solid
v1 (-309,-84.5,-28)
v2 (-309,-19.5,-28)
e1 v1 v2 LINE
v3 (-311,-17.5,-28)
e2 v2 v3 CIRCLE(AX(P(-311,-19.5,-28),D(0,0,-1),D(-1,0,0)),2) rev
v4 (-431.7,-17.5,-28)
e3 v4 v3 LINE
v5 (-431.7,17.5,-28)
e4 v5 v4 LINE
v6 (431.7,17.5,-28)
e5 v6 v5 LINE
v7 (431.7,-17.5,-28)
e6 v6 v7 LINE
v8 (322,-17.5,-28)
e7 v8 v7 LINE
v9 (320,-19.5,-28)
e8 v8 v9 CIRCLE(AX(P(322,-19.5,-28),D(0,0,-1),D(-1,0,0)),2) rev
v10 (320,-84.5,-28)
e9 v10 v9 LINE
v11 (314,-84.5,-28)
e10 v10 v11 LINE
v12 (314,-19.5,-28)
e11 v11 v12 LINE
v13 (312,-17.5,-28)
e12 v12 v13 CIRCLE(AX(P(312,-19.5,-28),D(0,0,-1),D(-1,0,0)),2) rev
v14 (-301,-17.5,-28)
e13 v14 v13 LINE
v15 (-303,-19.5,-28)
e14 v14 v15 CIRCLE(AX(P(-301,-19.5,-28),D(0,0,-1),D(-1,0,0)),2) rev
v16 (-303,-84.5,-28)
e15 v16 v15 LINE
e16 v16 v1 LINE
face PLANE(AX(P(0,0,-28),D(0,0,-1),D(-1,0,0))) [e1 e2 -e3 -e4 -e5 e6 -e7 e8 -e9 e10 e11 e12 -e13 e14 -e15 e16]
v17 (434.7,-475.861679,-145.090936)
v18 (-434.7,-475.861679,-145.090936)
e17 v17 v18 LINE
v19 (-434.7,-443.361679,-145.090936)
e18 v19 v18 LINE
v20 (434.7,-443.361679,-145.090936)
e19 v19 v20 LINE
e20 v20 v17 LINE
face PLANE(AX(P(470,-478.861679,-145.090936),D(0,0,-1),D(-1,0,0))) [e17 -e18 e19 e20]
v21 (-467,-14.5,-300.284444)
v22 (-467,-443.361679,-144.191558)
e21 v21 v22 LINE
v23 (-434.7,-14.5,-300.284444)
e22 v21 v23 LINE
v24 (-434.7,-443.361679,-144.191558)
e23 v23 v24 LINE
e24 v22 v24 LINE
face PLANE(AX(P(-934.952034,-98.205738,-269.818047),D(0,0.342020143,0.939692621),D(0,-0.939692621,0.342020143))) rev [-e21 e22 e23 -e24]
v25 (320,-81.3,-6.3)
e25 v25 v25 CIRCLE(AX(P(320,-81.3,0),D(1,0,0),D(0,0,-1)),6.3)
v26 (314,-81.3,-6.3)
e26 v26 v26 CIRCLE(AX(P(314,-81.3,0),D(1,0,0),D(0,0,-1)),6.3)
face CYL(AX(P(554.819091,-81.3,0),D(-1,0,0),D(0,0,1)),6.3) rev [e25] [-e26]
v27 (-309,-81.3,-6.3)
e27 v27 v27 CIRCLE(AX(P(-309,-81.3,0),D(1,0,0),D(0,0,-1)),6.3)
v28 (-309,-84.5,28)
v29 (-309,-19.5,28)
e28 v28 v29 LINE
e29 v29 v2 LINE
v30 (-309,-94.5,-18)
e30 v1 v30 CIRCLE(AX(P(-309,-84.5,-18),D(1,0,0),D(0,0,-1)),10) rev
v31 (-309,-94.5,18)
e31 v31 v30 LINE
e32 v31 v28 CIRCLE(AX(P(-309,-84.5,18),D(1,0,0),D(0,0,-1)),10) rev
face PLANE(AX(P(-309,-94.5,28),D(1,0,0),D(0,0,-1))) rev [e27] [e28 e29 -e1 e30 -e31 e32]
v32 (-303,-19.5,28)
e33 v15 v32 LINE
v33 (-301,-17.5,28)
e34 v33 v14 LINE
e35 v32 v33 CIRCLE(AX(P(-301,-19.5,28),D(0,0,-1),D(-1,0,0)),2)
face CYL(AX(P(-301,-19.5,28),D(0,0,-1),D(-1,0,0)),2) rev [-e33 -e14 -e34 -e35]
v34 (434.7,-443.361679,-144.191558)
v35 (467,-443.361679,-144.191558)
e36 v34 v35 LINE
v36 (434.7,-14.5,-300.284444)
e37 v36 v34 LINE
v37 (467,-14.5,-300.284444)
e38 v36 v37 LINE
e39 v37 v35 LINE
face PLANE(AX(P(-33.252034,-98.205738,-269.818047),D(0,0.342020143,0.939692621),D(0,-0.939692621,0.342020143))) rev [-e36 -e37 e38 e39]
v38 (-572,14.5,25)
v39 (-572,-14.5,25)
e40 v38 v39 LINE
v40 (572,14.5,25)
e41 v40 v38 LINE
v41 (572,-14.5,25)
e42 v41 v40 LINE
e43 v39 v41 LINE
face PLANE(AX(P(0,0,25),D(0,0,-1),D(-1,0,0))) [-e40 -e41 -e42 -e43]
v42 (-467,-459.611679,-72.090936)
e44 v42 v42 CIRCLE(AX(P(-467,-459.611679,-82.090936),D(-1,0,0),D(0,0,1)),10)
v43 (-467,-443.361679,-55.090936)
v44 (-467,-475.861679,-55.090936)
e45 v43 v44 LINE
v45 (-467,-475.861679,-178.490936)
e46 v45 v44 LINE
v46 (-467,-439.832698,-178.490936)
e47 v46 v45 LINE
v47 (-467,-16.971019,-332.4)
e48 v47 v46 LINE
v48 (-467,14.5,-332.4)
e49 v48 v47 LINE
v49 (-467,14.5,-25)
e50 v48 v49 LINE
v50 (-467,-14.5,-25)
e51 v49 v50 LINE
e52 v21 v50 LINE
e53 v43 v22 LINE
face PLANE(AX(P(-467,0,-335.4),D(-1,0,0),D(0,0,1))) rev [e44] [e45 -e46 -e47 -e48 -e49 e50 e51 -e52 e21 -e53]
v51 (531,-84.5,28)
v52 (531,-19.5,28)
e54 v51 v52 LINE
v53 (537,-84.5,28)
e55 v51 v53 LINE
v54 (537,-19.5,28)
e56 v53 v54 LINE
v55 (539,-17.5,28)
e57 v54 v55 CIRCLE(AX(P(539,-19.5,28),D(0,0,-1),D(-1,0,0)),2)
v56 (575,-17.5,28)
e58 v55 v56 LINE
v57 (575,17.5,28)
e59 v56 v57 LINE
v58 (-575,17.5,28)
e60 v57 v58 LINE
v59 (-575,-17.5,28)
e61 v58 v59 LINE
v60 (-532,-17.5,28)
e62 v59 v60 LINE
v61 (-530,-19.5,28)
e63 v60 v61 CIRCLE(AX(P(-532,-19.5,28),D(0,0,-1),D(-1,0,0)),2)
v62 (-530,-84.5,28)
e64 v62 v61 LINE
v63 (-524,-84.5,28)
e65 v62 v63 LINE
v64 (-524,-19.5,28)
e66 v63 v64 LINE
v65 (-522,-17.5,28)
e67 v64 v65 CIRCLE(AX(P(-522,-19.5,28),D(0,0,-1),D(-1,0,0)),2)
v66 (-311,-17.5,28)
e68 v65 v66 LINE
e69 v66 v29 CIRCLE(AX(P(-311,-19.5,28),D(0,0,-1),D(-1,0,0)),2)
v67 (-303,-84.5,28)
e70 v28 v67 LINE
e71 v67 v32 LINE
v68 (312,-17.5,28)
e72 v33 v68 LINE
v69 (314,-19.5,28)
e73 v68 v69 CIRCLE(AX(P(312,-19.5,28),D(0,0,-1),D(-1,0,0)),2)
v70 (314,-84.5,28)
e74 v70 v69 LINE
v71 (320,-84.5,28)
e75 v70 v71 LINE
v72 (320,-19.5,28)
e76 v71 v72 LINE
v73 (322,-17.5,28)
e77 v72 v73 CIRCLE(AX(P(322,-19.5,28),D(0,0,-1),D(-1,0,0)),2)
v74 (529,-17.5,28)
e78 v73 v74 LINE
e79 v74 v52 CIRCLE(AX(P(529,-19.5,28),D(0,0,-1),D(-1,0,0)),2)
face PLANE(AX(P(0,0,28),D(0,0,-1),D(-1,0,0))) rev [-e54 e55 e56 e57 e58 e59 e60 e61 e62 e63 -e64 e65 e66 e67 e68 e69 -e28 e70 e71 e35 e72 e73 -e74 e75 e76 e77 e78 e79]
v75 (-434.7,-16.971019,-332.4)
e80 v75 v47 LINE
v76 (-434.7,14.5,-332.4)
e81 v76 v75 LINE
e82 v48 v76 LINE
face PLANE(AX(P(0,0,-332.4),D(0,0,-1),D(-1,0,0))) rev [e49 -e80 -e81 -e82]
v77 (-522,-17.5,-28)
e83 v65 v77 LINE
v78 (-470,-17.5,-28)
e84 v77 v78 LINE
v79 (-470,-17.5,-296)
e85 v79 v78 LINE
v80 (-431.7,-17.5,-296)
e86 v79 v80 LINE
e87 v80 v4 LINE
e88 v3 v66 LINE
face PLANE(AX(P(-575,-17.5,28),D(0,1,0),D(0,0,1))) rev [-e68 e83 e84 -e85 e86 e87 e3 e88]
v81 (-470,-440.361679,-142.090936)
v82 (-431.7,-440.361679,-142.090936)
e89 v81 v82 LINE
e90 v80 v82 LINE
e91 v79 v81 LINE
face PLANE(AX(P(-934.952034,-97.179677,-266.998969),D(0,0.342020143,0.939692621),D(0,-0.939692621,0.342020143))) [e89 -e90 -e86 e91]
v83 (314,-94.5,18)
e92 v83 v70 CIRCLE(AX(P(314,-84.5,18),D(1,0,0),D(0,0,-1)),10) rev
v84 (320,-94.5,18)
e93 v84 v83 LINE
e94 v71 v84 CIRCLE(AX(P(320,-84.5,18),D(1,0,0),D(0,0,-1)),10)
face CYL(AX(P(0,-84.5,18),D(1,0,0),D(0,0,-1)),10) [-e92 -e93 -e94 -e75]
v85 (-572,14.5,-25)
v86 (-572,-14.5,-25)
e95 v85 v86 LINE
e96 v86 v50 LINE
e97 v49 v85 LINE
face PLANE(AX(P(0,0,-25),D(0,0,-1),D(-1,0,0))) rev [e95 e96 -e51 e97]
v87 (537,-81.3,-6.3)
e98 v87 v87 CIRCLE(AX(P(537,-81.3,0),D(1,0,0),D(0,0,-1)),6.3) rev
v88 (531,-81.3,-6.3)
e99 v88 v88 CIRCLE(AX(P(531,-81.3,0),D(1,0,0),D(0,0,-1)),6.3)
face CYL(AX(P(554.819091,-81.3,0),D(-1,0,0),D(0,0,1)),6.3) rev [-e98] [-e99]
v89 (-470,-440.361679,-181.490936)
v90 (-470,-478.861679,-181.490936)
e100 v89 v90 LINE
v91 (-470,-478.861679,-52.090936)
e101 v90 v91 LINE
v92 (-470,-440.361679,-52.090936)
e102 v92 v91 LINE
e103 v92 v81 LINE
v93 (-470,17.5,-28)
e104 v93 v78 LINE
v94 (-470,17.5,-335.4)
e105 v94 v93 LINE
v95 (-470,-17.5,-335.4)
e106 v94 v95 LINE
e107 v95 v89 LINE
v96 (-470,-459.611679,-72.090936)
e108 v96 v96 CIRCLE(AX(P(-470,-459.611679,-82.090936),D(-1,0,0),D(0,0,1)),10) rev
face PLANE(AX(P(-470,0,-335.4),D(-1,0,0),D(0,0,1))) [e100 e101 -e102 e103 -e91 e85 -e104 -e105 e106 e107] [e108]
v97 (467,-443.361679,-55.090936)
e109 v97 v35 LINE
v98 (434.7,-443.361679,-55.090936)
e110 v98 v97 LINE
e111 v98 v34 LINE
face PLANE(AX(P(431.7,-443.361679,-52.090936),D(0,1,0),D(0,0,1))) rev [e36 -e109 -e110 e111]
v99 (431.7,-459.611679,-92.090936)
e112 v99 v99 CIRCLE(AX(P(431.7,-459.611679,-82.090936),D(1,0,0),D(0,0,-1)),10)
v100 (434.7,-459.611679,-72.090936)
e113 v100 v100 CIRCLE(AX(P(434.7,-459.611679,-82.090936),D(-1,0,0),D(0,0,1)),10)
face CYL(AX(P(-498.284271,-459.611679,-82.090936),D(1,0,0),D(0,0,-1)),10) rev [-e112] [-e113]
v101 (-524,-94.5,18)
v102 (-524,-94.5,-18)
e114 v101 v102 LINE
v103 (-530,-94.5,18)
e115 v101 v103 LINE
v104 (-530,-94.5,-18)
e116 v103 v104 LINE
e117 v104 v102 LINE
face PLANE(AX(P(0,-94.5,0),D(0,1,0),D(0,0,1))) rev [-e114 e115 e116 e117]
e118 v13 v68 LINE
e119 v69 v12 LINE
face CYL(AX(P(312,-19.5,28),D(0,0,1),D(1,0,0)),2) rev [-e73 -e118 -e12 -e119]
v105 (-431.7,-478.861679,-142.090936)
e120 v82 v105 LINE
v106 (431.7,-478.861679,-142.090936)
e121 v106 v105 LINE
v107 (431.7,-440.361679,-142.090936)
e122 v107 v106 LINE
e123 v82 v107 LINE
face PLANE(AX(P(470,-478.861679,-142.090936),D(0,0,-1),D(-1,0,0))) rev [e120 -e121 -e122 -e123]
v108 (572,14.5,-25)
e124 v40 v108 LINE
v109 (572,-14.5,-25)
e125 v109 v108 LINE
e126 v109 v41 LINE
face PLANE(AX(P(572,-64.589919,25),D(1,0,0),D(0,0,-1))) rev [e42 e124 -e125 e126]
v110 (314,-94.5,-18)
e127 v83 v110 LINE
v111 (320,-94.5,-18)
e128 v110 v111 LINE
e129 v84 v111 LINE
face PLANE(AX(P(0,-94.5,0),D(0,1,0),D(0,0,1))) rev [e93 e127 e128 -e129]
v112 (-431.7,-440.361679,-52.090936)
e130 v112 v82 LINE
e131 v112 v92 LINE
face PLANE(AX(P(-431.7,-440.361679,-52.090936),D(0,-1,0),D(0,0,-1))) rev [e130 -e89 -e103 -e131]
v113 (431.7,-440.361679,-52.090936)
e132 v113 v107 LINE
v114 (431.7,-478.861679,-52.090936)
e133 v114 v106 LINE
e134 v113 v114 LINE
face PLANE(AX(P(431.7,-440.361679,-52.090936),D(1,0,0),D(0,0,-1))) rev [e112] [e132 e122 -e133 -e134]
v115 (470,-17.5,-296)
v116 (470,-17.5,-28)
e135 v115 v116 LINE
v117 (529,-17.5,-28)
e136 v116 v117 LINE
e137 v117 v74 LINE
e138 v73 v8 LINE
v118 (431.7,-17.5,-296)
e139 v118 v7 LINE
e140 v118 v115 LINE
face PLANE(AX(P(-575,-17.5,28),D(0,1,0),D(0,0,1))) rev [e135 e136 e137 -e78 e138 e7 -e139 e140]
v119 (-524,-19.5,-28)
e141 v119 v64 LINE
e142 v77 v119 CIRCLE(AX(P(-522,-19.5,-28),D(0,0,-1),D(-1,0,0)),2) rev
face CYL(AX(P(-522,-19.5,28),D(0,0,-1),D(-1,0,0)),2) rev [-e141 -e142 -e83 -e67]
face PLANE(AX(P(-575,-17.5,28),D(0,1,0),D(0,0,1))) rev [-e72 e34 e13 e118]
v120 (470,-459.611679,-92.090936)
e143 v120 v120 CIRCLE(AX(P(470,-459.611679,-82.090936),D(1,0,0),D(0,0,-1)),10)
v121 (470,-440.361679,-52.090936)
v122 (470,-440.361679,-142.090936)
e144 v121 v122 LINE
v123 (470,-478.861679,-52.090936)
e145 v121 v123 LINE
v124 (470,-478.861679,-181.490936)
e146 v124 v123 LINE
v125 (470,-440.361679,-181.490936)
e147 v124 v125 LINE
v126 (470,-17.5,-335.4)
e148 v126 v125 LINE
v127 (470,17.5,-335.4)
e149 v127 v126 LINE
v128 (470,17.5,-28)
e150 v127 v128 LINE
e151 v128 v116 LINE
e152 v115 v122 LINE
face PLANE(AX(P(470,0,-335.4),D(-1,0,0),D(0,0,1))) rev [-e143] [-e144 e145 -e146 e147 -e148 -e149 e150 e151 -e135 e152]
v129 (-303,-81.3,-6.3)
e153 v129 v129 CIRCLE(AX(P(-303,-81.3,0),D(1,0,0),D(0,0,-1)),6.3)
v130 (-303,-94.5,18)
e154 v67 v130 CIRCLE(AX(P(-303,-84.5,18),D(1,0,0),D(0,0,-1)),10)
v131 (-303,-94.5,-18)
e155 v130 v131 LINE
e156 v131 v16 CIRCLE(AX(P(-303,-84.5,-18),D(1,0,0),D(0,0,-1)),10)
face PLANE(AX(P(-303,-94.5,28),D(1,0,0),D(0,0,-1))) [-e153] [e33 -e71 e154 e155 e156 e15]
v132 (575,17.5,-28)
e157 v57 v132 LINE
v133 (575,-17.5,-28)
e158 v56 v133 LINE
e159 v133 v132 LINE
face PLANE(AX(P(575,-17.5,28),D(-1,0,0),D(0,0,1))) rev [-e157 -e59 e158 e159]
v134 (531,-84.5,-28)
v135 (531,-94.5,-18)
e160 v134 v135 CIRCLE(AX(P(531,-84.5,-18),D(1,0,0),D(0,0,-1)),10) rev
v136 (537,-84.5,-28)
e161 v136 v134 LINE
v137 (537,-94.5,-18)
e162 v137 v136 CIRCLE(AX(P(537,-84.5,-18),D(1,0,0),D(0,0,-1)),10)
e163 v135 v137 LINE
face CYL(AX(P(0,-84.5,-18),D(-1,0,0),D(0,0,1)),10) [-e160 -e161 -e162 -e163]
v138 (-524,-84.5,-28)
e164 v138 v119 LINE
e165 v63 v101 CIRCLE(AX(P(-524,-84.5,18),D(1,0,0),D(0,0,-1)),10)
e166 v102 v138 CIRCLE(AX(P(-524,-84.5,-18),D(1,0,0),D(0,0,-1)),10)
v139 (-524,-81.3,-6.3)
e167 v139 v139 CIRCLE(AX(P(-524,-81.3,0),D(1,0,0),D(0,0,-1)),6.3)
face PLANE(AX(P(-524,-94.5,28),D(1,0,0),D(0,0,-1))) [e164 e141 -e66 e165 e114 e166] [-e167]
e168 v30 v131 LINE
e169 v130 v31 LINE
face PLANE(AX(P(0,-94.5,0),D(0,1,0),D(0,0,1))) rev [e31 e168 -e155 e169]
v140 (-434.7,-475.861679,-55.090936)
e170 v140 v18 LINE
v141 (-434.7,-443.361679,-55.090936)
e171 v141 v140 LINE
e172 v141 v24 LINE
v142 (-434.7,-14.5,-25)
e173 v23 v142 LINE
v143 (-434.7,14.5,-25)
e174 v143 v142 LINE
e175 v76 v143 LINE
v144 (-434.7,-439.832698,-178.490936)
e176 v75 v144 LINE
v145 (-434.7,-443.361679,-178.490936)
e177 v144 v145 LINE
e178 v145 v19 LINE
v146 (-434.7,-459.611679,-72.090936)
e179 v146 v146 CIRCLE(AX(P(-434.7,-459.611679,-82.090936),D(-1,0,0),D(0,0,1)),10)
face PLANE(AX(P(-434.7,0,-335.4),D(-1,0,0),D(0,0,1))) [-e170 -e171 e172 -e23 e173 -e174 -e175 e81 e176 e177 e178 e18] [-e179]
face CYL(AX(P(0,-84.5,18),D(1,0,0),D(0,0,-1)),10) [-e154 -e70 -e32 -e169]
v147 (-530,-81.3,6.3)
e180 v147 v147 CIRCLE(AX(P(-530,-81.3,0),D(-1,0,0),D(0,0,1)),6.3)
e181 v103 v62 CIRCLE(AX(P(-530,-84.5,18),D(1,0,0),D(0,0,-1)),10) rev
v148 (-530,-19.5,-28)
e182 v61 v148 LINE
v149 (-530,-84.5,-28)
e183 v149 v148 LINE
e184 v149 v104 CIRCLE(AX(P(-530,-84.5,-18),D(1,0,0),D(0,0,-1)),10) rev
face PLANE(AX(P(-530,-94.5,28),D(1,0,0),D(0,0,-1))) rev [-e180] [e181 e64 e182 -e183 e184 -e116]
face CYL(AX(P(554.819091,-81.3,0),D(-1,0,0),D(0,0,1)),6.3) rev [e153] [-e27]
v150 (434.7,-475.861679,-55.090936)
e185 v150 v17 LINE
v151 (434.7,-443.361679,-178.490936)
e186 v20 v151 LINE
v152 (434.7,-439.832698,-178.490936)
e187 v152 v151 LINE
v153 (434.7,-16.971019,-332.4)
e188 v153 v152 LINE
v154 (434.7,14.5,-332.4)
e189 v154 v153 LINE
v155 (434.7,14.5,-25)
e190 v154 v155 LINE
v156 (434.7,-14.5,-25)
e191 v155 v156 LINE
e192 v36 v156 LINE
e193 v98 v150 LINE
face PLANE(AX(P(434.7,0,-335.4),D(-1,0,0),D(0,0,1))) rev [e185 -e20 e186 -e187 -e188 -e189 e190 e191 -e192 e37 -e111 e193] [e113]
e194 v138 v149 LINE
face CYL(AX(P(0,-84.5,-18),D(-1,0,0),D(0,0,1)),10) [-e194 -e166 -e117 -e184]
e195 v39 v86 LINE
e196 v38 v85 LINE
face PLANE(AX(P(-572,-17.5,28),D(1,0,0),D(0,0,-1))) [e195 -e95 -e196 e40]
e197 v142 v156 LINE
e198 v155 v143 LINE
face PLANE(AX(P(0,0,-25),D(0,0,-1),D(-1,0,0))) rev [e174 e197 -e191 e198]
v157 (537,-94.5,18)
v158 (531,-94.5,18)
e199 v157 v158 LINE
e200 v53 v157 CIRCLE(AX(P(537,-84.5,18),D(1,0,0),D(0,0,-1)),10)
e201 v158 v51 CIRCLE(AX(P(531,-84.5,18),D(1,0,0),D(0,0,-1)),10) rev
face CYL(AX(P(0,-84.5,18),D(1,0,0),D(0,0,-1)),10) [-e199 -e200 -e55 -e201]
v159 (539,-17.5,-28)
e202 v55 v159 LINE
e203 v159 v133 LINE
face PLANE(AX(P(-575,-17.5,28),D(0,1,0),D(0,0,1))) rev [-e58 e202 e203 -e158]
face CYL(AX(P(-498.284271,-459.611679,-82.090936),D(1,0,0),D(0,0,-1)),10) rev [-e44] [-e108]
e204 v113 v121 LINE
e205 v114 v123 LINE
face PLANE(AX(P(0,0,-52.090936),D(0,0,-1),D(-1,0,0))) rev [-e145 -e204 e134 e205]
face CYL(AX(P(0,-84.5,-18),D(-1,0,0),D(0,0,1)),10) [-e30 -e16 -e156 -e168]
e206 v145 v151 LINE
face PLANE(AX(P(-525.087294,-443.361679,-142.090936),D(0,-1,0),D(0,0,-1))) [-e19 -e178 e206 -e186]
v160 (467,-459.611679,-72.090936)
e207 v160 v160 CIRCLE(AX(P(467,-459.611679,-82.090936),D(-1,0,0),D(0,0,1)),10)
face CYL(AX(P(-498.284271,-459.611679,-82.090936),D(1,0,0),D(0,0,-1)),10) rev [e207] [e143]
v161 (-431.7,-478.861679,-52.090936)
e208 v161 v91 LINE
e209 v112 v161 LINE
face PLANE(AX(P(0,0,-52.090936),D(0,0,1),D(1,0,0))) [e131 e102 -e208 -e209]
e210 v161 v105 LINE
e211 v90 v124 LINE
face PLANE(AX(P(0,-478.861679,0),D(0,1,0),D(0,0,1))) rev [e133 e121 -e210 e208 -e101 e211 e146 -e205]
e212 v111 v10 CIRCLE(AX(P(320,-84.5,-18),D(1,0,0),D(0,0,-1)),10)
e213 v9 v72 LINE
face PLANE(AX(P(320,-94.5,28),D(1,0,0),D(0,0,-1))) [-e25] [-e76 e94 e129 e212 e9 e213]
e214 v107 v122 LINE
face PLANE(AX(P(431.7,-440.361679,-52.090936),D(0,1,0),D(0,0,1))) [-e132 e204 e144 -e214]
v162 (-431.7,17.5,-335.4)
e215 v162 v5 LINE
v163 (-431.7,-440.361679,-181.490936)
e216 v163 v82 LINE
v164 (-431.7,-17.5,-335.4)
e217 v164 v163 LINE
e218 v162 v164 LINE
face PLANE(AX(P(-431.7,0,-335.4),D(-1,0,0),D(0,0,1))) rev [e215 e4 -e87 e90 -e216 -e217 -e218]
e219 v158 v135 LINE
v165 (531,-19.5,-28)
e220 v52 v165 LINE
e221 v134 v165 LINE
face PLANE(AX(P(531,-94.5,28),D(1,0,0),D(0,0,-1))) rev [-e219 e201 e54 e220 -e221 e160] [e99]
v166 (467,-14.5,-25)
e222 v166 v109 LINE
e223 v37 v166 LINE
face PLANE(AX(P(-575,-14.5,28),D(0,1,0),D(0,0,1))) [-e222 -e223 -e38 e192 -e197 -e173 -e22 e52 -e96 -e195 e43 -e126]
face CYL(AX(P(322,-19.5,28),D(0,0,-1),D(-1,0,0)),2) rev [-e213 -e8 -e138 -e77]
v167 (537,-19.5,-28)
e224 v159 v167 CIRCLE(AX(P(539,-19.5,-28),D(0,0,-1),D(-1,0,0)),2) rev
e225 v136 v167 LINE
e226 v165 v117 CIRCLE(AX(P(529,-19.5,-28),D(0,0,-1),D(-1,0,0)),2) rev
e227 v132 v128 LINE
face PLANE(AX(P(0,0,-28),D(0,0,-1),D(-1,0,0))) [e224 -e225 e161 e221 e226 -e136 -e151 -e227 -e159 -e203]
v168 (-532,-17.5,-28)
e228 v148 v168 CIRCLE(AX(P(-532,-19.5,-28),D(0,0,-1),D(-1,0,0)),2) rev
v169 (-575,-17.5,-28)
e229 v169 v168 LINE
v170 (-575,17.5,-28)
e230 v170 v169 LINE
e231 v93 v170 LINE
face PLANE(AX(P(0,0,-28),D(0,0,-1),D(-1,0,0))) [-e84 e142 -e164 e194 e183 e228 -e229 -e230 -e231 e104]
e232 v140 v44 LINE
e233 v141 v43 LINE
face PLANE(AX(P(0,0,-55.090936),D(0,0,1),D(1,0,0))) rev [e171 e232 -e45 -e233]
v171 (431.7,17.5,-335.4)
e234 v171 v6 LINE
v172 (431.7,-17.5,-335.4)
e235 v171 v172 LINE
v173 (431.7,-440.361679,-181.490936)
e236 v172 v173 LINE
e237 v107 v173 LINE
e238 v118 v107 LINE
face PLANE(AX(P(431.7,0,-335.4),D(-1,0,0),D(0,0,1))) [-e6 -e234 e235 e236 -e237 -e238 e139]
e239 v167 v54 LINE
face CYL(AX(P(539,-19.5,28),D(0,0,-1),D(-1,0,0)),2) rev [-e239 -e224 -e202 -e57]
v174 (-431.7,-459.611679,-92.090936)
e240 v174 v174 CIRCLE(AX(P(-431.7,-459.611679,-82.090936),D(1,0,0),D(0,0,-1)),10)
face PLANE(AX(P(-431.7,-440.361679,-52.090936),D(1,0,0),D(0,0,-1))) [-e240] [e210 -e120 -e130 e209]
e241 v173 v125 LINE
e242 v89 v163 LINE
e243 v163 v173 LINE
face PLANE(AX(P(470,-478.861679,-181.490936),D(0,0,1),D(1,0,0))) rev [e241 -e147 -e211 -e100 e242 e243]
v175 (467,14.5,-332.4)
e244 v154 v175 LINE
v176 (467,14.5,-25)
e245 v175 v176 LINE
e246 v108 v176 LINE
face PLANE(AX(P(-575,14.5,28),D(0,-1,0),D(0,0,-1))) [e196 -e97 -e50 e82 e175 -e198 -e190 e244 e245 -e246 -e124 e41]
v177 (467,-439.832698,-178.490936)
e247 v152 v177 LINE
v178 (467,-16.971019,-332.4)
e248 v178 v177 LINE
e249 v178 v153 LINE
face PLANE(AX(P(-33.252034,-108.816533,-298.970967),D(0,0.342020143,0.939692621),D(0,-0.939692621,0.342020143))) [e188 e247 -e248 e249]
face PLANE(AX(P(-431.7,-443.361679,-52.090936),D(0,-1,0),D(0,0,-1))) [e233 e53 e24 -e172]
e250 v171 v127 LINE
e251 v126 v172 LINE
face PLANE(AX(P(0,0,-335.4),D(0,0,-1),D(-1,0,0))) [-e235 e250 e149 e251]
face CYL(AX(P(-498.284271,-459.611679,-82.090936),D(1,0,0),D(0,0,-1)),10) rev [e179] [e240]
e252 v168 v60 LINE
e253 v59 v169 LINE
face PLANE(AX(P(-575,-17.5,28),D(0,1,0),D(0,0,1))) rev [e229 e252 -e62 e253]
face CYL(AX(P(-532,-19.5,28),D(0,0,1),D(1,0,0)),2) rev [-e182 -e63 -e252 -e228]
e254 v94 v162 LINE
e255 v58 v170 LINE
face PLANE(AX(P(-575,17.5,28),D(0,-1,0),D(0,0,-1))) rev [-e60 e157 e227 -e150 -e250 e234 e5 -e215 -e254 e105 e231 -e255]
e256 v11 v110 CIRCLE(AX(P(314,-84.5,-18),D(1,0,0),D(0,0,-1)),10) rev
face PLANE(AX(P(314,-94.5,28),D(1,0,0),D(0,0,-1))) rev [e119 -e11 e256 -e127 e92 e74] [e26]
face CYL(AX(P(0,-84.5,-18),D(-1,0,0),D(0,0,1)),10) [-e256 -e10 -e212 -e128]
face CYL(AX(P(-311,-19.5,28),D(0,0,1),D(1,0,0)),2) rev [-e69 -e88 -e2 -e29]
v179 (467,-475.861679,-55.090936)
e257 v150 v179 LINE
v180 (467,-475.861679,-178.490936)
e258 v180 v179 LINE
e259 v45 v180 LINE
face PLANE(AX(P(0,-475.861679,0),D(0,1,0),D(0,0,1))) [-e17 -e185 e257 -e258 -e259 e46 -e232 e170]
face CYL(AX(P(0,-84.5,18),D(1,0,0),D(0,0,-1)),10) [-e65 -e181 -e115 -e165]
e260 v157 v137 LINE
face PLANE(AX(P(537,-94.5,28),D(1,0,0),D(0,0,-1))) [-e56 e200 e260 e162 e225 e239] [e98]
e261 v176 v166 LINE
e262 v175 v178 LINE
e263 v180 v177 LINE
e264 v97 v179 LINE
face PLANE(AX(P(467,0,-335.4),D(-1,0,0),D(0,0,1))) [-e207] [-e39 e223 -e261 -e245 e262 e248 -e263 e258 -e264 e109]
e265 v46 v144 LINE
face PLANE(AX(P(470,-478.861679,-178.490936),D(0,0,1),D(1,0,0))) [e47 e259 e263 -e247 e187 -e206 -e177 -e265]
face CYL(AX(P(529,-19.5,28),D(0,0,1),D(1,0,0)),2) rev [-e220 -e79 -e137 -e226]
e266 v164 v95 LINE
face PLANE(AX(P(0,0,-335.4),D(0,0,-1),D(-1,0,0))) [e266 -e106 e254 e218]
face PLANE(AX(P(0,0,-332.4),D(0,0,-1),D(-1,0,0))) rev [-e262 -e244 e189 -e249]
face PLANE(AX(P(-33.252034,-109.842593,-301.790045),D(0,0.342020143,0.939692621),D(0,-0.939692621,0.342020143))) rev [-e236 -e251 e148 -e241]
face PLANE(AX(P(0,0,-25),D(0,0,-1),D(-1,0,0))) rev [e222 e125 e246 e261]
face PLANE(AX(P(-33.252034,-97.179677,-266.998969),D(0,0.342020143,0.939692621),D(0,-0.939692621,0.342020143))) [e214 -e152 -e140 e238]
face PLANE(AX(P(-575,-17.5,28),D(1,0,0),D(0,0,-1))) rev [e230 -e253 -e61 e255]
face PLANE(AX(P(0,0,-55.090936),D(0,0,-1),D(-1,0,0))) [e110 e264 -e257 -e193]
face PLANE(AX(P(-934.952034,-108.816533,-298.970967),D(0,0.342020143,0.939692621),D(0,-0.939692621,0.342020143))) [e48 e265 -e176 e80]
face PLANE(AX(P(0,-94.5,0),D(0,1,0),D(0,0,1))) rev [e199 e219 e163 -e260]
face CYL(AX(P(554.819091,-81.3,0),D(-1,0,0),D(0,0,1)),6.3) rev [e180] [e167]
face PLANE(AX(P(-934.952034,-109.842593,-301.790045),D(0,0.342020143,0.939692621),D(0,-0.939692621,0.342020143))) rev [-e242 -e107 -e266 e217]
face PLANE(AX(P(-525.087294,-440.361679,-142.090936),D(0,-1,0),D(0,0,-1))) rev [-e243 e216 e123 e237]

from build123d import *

# Parameters (mm, degrees)
SKETCH1_W            = 1150
SKETCH1_H            = 35
BOSS_EXTRUDE1_DEPTH  = 28
SKETCH4_W            = 38.3
SKETCH4_H            = 35
BOSS_EXTRUDE4_DEPTH  = 307.4
BOSS_EXTRUDE5_DEPTH  = 38.3
BOSS_EXTRUDE6_DEPTH  = 38.3
SKETCH7_W            = 38.3
SKETCH7_H            = 39.4
BOSS_EXTRUDE7_DEPTH  = 38.5
SKETCH8_W            = 39.4
SKETCH8_H            = 38.5
BOSS_EXTRUDE8_DEPTH  = 901.7
SKETCH9_W            = 38.3
SKETCH9_H            = 38.5
BOSS_EXTRUDE9_DEPTH  = 90
SKETCH11_W           = 6
SKETCH11_H           = 56
BOSS_EXTRUDE10_DEPTH = 77
FILLET1_R            = 10
CUT_EXTRUDE1_REACH   = 1252.131
SKETCH12_R           = 6.3
SHELL1_START         = -467
SHELL1_OUTLINE_W     = 32.5
SHELL1_OUTLINE_H     = 33.4
SHELL1_OUTLINE_W_2   = 29
SHELL1_OUTLINE_H_2   = 50
SHELL1_DEPTH         = 934
SHELL1_2_DEPTH       = 32.3
SHELL1_START_2       = 434.7
SHELL1_3_DEPTH       = 32.3
SHELL1_START_3       = -572
SHELL1_4_OUTLINE_W   = 29
SHELL1_4_OUTLINE_H   = 50
SHELL1_4_DEPTH       = 1147
BOSS_EXTRUDE12_REACH = 830.567
SKETCH17_W           = 3
SKETCH17_H           = 50
FILLET2_R            = 2
CUT_EXTRUDE2_START   = -940
SKETCH18_R           = 10
CUT_EXTRUDE2_DEPTH   = 940


# Read off the part's stored shape, not the designer's step: Shell1
with BuildPart() as part:
    # Sketch1 → Boss-Extrude1 (new, symmetric)
    with BuildSketch(Plane.XY):
        Rectangle(SKETCH1_W, SKETCH1_H)
    extrude(amount=BOSS_EXTRUDE1_DEPTH, both=True)

    # Sketch4 → Boss-Extrude4 (add)
    with BuildSketch(Plane(origin=(0, 0, -28), x_dir=(-1, 0, 0), z_dir=(0, 0, -1))):
        with Locations((-450.85, 0)):
            Rectangle(SKETCH4_W, SKETCH4_H)
        with Locations((450.85, 0)):
            Rectangle(SKETCH4_W, SKETCH4_H)
    extrude(amount=BOSS_EXTRUDE4_DEPTH)

    # Sketch5 → Boss-Extrude5 (add)
    with BuildSketch(Plane(origin=(470, 0, 0), x_dir=(0, 0, -1), z_dir=(1, 0, 0))):
        Polygon((335.4, -17.5), (296, -17.5), (142.090935503, -440.361679354), (181.490935503, -440.361679354), align=None)
    extrude(amount=-BOSS_EXTRUDE5_DEPTH)

    # Sketch6 → Boss-Extrude6 (add)
    with BuildSketch(Plane(origin=(-431.7, 0, 0), x_dir=(0, 0, -1), z_dir=(1, 0, 0))):
        Polygon((335.4, -17.5), (296, -17.5), (142.090935503, -440.361679354), (181.490935503, -440.361679354), align=None)
    extrude(amount=-BOSS_EXTRUDE6_DEPTH)

    # Sketch7 → Boss-Extrude7 (add)
    with BuildSketch(Plane.XZ.offset(440.361679354)):
        with Locations((450.85, -161.790935503)):
            Rectangle(SKETCH7_W, SKETCH7_H)
    extrude(amount=BOSS_EXTRUDE7_DEPTH)

    # Sketch8 → Boss-Extrude8 (add)
    with BuildSketch(Plane.ZY.offset(-431.7)):
        with Locations((-161.790935503, -459.611679354)):
            Rectangle(SKETCH8_W, SKETCH8_H)
    extrude(amount=BOSS_EXTRUDE8_DEPTH)

    # Sketch9 → Boss-Extrude9 (add)
    with BuildSketch(Plane.XY.offset(-142.090935503)):
        with Locations((-450.85, -459.611679354)):
            Rectangle(SKETCH9_W, SKETCH9_H)
        with Locations((450.85, -459.611679354)):
            Rectangle(SKETCH9_W, SKETCH9_H)
    extrude(amount=BOSS_EXTRUDE9_DEPTH)

    # Sketch11 → Boss-Extrude10 (add)
    with BuildSketch(Plane.XZ.offset(17.5)):
        with Locations((-527, 0)):
            Rectangle(SKETCH11_W, SKETCH11_H)
        with Locations((-306, 0)):
            Rectangle(SKETCH11_W, SKETCH11_H)
        with Locations((317, 0)):
            Rectangle(SKETCH11_W, SKETCH11_H)
        with Locations((534, 0)):
            Rectangle(SKETCH11_W, SKETCH11_H)
    extrude(amount=BOSS_EXTRUDE10_DEPTH)

    # Fillet1
    fillet1_edges = [part.edges().sort_by_distance(p)[0] for p in [
        (-527, -94.5, 28),
        (-527, -94.5, -28),
        (-306, -94.5, 28),
        (-306, -94.5, -28),
        (534, -94.5, 28),
        (534, -94.5, -28),
        (317, -94.5, 28),
        (317, -94.5, -28),
    ]]
    fillet(fillet1_edges, radius=FILLET1_R)

    # Cut-Extrude1: up to this face of the body (flat: up to its plane)
    cut_extrude1_end = Plane(part.part.faces().sort_by_distance((537, -55.635386562, 0))[0])
    # Sketch12 → Cut-Extrude1 (cut, up to the picked face)
    with BuildSketch(Plane.ZY.offset(530), mode=Mode.PRIVATE) as cut_extrude1_sk1:
        with Locations(Location((0, -81.3, 0), (0, 0, 180))):
            Circle(SKETCH12_R)
    cut_extrude1_tool1 = split(extrude(cut_extrude1_sk1.sketch, amount=-CUT_EXTRUDE1_REACH, mode=Mode.PRIVATE), bisect_by=cut_extrude1_end, keep=Keep.BOTH, mode=Mode.PRIVATE)
    add(cut_extrude1_tool1.solids().sort_by(Axis((-530, -81.3, 0), (1, 0, 0)))[0], mode=Mode.SUBTRACT)

    # Shell1 outline → Shell1 (cut)
    with BuildSketch(Plane.YZ.offset(SHELL1_START)):
        with Locations((-459.611679354, -161.790935503)):
            Rectangle(SHELL1_OUTLINE_W, SHELL1_OUTLINE_H)
        Rectangle(SHELL1_OUTLINE_W_2, SHELL1_OUTLINE_H_2)
    extrude(amount=SHELL1_DEPTH, mode=Mode.SUBTRACT)

    # Shell1 2 outline → Shell1 2 (cut)
    with BuildSketch(Plane.YZ.offset(SHELL1_START)):
        Polygon((-475.861679354, -55.090935503), (-475.861679354, -145.090935503), (-443.361679354, -145.090935503), (-443.361679354, -178.490935503), (-439.832698412, -178.490935503), (-16.971019058, -332.4), (14.5, -332.4), (14.5, -25), (-14.5, -25), (-14.5, -300.28444402), (-443.361679354, -144.191558118), (-443.361679354, -55.090935503), align=None)
    extrude(amount=SHELL1_2_DEPTH, mode=Mode.SUBTRACT)

    # Shell1 3 outline → Shell1 3 (cut)
    with BuildSketch(Plane.YZ.offset(SHELL1_START_2)):
        Polygon((-475.861679354, -55.090935503), (-475.861679354, -145.090935503), (-443.361679354, -145.090935503), (-443.361679354, -178.490935503), (-439.832698412, -178.490935503), (-16.971019058, -332.4), (14.5, -332.4), (14.5, -25), (-14.5, -25), (-14.5, -300.28444402), (-443.361679354, -144.191558118), (-443.361679354, -55.090935503), align=None)
    extrude(amount=SHELL1_3_DEPTH, mode=Mode.SUBTRACT)

    # Shell1 4 outline → Shell1 4 (cut)
    with BuildSketch(Plane.YZ.offset(SHELL1_START_3)):
        Rectangle(SHELL1_4_OUTLINE_W, SHELL1_4_OUTLINE_H)
    extrude(amount=SHELL1_4_DEPTH, mode=Mode.SUBTRACT)

    # Sketch17 → Boss-Extrude12 (add, up to next)
    with BuildSketch(Plane.XZ.offset(-14.5), mode=Mode.PRIVATE) as boss_extrude12_sk1:
        with Locations((573.5, 0)):
            Rectangle(SKETCH17_W, SKETCH17_H)
    boss_extrude12_tool1 = extrude(boss_extrude12_sk1.sketch, amount=BOSS_EXTRUDE12_REACH, mode=Mode.PRIVATE) - part.part
    add(boss_extrude12_tool1.solids().sort_by_distance((573.5, 14.5, 0))[0])

    # Fillet2
    fillet2_edges = [part.edges().sort_by_distance(p)[0] for p in [
        (-530, -17.5, 0),
        (-524, -17.5, 0),
        (-309, -17.5, 0),
        (-303, -17.5, 0),
        (531, -17.5, 0),
        (537, -17.5, 0),
        (314, -17.5, 0),
        (320, -17.5, 0),
    ]]
    fillet(fillet2_edges, radius=FILLET2_R)

    # Sketch18 → Cut-Extrude2 (cut)
    with BuildSketch(Plane(origin=(470, 0, 0), x_dir=(0, 0, -1), z_dir=(1, 0, 0)).offset(CUT_EXTRUDE2_START)):
        with Locations((82.090935503, -459.611679354)):
            Circle(SKETCH18_R)
    extrude(amount=CUT_EXTRUDE2_DEPTH, mode=Mode.SUBTRACT)


solid = part.part
